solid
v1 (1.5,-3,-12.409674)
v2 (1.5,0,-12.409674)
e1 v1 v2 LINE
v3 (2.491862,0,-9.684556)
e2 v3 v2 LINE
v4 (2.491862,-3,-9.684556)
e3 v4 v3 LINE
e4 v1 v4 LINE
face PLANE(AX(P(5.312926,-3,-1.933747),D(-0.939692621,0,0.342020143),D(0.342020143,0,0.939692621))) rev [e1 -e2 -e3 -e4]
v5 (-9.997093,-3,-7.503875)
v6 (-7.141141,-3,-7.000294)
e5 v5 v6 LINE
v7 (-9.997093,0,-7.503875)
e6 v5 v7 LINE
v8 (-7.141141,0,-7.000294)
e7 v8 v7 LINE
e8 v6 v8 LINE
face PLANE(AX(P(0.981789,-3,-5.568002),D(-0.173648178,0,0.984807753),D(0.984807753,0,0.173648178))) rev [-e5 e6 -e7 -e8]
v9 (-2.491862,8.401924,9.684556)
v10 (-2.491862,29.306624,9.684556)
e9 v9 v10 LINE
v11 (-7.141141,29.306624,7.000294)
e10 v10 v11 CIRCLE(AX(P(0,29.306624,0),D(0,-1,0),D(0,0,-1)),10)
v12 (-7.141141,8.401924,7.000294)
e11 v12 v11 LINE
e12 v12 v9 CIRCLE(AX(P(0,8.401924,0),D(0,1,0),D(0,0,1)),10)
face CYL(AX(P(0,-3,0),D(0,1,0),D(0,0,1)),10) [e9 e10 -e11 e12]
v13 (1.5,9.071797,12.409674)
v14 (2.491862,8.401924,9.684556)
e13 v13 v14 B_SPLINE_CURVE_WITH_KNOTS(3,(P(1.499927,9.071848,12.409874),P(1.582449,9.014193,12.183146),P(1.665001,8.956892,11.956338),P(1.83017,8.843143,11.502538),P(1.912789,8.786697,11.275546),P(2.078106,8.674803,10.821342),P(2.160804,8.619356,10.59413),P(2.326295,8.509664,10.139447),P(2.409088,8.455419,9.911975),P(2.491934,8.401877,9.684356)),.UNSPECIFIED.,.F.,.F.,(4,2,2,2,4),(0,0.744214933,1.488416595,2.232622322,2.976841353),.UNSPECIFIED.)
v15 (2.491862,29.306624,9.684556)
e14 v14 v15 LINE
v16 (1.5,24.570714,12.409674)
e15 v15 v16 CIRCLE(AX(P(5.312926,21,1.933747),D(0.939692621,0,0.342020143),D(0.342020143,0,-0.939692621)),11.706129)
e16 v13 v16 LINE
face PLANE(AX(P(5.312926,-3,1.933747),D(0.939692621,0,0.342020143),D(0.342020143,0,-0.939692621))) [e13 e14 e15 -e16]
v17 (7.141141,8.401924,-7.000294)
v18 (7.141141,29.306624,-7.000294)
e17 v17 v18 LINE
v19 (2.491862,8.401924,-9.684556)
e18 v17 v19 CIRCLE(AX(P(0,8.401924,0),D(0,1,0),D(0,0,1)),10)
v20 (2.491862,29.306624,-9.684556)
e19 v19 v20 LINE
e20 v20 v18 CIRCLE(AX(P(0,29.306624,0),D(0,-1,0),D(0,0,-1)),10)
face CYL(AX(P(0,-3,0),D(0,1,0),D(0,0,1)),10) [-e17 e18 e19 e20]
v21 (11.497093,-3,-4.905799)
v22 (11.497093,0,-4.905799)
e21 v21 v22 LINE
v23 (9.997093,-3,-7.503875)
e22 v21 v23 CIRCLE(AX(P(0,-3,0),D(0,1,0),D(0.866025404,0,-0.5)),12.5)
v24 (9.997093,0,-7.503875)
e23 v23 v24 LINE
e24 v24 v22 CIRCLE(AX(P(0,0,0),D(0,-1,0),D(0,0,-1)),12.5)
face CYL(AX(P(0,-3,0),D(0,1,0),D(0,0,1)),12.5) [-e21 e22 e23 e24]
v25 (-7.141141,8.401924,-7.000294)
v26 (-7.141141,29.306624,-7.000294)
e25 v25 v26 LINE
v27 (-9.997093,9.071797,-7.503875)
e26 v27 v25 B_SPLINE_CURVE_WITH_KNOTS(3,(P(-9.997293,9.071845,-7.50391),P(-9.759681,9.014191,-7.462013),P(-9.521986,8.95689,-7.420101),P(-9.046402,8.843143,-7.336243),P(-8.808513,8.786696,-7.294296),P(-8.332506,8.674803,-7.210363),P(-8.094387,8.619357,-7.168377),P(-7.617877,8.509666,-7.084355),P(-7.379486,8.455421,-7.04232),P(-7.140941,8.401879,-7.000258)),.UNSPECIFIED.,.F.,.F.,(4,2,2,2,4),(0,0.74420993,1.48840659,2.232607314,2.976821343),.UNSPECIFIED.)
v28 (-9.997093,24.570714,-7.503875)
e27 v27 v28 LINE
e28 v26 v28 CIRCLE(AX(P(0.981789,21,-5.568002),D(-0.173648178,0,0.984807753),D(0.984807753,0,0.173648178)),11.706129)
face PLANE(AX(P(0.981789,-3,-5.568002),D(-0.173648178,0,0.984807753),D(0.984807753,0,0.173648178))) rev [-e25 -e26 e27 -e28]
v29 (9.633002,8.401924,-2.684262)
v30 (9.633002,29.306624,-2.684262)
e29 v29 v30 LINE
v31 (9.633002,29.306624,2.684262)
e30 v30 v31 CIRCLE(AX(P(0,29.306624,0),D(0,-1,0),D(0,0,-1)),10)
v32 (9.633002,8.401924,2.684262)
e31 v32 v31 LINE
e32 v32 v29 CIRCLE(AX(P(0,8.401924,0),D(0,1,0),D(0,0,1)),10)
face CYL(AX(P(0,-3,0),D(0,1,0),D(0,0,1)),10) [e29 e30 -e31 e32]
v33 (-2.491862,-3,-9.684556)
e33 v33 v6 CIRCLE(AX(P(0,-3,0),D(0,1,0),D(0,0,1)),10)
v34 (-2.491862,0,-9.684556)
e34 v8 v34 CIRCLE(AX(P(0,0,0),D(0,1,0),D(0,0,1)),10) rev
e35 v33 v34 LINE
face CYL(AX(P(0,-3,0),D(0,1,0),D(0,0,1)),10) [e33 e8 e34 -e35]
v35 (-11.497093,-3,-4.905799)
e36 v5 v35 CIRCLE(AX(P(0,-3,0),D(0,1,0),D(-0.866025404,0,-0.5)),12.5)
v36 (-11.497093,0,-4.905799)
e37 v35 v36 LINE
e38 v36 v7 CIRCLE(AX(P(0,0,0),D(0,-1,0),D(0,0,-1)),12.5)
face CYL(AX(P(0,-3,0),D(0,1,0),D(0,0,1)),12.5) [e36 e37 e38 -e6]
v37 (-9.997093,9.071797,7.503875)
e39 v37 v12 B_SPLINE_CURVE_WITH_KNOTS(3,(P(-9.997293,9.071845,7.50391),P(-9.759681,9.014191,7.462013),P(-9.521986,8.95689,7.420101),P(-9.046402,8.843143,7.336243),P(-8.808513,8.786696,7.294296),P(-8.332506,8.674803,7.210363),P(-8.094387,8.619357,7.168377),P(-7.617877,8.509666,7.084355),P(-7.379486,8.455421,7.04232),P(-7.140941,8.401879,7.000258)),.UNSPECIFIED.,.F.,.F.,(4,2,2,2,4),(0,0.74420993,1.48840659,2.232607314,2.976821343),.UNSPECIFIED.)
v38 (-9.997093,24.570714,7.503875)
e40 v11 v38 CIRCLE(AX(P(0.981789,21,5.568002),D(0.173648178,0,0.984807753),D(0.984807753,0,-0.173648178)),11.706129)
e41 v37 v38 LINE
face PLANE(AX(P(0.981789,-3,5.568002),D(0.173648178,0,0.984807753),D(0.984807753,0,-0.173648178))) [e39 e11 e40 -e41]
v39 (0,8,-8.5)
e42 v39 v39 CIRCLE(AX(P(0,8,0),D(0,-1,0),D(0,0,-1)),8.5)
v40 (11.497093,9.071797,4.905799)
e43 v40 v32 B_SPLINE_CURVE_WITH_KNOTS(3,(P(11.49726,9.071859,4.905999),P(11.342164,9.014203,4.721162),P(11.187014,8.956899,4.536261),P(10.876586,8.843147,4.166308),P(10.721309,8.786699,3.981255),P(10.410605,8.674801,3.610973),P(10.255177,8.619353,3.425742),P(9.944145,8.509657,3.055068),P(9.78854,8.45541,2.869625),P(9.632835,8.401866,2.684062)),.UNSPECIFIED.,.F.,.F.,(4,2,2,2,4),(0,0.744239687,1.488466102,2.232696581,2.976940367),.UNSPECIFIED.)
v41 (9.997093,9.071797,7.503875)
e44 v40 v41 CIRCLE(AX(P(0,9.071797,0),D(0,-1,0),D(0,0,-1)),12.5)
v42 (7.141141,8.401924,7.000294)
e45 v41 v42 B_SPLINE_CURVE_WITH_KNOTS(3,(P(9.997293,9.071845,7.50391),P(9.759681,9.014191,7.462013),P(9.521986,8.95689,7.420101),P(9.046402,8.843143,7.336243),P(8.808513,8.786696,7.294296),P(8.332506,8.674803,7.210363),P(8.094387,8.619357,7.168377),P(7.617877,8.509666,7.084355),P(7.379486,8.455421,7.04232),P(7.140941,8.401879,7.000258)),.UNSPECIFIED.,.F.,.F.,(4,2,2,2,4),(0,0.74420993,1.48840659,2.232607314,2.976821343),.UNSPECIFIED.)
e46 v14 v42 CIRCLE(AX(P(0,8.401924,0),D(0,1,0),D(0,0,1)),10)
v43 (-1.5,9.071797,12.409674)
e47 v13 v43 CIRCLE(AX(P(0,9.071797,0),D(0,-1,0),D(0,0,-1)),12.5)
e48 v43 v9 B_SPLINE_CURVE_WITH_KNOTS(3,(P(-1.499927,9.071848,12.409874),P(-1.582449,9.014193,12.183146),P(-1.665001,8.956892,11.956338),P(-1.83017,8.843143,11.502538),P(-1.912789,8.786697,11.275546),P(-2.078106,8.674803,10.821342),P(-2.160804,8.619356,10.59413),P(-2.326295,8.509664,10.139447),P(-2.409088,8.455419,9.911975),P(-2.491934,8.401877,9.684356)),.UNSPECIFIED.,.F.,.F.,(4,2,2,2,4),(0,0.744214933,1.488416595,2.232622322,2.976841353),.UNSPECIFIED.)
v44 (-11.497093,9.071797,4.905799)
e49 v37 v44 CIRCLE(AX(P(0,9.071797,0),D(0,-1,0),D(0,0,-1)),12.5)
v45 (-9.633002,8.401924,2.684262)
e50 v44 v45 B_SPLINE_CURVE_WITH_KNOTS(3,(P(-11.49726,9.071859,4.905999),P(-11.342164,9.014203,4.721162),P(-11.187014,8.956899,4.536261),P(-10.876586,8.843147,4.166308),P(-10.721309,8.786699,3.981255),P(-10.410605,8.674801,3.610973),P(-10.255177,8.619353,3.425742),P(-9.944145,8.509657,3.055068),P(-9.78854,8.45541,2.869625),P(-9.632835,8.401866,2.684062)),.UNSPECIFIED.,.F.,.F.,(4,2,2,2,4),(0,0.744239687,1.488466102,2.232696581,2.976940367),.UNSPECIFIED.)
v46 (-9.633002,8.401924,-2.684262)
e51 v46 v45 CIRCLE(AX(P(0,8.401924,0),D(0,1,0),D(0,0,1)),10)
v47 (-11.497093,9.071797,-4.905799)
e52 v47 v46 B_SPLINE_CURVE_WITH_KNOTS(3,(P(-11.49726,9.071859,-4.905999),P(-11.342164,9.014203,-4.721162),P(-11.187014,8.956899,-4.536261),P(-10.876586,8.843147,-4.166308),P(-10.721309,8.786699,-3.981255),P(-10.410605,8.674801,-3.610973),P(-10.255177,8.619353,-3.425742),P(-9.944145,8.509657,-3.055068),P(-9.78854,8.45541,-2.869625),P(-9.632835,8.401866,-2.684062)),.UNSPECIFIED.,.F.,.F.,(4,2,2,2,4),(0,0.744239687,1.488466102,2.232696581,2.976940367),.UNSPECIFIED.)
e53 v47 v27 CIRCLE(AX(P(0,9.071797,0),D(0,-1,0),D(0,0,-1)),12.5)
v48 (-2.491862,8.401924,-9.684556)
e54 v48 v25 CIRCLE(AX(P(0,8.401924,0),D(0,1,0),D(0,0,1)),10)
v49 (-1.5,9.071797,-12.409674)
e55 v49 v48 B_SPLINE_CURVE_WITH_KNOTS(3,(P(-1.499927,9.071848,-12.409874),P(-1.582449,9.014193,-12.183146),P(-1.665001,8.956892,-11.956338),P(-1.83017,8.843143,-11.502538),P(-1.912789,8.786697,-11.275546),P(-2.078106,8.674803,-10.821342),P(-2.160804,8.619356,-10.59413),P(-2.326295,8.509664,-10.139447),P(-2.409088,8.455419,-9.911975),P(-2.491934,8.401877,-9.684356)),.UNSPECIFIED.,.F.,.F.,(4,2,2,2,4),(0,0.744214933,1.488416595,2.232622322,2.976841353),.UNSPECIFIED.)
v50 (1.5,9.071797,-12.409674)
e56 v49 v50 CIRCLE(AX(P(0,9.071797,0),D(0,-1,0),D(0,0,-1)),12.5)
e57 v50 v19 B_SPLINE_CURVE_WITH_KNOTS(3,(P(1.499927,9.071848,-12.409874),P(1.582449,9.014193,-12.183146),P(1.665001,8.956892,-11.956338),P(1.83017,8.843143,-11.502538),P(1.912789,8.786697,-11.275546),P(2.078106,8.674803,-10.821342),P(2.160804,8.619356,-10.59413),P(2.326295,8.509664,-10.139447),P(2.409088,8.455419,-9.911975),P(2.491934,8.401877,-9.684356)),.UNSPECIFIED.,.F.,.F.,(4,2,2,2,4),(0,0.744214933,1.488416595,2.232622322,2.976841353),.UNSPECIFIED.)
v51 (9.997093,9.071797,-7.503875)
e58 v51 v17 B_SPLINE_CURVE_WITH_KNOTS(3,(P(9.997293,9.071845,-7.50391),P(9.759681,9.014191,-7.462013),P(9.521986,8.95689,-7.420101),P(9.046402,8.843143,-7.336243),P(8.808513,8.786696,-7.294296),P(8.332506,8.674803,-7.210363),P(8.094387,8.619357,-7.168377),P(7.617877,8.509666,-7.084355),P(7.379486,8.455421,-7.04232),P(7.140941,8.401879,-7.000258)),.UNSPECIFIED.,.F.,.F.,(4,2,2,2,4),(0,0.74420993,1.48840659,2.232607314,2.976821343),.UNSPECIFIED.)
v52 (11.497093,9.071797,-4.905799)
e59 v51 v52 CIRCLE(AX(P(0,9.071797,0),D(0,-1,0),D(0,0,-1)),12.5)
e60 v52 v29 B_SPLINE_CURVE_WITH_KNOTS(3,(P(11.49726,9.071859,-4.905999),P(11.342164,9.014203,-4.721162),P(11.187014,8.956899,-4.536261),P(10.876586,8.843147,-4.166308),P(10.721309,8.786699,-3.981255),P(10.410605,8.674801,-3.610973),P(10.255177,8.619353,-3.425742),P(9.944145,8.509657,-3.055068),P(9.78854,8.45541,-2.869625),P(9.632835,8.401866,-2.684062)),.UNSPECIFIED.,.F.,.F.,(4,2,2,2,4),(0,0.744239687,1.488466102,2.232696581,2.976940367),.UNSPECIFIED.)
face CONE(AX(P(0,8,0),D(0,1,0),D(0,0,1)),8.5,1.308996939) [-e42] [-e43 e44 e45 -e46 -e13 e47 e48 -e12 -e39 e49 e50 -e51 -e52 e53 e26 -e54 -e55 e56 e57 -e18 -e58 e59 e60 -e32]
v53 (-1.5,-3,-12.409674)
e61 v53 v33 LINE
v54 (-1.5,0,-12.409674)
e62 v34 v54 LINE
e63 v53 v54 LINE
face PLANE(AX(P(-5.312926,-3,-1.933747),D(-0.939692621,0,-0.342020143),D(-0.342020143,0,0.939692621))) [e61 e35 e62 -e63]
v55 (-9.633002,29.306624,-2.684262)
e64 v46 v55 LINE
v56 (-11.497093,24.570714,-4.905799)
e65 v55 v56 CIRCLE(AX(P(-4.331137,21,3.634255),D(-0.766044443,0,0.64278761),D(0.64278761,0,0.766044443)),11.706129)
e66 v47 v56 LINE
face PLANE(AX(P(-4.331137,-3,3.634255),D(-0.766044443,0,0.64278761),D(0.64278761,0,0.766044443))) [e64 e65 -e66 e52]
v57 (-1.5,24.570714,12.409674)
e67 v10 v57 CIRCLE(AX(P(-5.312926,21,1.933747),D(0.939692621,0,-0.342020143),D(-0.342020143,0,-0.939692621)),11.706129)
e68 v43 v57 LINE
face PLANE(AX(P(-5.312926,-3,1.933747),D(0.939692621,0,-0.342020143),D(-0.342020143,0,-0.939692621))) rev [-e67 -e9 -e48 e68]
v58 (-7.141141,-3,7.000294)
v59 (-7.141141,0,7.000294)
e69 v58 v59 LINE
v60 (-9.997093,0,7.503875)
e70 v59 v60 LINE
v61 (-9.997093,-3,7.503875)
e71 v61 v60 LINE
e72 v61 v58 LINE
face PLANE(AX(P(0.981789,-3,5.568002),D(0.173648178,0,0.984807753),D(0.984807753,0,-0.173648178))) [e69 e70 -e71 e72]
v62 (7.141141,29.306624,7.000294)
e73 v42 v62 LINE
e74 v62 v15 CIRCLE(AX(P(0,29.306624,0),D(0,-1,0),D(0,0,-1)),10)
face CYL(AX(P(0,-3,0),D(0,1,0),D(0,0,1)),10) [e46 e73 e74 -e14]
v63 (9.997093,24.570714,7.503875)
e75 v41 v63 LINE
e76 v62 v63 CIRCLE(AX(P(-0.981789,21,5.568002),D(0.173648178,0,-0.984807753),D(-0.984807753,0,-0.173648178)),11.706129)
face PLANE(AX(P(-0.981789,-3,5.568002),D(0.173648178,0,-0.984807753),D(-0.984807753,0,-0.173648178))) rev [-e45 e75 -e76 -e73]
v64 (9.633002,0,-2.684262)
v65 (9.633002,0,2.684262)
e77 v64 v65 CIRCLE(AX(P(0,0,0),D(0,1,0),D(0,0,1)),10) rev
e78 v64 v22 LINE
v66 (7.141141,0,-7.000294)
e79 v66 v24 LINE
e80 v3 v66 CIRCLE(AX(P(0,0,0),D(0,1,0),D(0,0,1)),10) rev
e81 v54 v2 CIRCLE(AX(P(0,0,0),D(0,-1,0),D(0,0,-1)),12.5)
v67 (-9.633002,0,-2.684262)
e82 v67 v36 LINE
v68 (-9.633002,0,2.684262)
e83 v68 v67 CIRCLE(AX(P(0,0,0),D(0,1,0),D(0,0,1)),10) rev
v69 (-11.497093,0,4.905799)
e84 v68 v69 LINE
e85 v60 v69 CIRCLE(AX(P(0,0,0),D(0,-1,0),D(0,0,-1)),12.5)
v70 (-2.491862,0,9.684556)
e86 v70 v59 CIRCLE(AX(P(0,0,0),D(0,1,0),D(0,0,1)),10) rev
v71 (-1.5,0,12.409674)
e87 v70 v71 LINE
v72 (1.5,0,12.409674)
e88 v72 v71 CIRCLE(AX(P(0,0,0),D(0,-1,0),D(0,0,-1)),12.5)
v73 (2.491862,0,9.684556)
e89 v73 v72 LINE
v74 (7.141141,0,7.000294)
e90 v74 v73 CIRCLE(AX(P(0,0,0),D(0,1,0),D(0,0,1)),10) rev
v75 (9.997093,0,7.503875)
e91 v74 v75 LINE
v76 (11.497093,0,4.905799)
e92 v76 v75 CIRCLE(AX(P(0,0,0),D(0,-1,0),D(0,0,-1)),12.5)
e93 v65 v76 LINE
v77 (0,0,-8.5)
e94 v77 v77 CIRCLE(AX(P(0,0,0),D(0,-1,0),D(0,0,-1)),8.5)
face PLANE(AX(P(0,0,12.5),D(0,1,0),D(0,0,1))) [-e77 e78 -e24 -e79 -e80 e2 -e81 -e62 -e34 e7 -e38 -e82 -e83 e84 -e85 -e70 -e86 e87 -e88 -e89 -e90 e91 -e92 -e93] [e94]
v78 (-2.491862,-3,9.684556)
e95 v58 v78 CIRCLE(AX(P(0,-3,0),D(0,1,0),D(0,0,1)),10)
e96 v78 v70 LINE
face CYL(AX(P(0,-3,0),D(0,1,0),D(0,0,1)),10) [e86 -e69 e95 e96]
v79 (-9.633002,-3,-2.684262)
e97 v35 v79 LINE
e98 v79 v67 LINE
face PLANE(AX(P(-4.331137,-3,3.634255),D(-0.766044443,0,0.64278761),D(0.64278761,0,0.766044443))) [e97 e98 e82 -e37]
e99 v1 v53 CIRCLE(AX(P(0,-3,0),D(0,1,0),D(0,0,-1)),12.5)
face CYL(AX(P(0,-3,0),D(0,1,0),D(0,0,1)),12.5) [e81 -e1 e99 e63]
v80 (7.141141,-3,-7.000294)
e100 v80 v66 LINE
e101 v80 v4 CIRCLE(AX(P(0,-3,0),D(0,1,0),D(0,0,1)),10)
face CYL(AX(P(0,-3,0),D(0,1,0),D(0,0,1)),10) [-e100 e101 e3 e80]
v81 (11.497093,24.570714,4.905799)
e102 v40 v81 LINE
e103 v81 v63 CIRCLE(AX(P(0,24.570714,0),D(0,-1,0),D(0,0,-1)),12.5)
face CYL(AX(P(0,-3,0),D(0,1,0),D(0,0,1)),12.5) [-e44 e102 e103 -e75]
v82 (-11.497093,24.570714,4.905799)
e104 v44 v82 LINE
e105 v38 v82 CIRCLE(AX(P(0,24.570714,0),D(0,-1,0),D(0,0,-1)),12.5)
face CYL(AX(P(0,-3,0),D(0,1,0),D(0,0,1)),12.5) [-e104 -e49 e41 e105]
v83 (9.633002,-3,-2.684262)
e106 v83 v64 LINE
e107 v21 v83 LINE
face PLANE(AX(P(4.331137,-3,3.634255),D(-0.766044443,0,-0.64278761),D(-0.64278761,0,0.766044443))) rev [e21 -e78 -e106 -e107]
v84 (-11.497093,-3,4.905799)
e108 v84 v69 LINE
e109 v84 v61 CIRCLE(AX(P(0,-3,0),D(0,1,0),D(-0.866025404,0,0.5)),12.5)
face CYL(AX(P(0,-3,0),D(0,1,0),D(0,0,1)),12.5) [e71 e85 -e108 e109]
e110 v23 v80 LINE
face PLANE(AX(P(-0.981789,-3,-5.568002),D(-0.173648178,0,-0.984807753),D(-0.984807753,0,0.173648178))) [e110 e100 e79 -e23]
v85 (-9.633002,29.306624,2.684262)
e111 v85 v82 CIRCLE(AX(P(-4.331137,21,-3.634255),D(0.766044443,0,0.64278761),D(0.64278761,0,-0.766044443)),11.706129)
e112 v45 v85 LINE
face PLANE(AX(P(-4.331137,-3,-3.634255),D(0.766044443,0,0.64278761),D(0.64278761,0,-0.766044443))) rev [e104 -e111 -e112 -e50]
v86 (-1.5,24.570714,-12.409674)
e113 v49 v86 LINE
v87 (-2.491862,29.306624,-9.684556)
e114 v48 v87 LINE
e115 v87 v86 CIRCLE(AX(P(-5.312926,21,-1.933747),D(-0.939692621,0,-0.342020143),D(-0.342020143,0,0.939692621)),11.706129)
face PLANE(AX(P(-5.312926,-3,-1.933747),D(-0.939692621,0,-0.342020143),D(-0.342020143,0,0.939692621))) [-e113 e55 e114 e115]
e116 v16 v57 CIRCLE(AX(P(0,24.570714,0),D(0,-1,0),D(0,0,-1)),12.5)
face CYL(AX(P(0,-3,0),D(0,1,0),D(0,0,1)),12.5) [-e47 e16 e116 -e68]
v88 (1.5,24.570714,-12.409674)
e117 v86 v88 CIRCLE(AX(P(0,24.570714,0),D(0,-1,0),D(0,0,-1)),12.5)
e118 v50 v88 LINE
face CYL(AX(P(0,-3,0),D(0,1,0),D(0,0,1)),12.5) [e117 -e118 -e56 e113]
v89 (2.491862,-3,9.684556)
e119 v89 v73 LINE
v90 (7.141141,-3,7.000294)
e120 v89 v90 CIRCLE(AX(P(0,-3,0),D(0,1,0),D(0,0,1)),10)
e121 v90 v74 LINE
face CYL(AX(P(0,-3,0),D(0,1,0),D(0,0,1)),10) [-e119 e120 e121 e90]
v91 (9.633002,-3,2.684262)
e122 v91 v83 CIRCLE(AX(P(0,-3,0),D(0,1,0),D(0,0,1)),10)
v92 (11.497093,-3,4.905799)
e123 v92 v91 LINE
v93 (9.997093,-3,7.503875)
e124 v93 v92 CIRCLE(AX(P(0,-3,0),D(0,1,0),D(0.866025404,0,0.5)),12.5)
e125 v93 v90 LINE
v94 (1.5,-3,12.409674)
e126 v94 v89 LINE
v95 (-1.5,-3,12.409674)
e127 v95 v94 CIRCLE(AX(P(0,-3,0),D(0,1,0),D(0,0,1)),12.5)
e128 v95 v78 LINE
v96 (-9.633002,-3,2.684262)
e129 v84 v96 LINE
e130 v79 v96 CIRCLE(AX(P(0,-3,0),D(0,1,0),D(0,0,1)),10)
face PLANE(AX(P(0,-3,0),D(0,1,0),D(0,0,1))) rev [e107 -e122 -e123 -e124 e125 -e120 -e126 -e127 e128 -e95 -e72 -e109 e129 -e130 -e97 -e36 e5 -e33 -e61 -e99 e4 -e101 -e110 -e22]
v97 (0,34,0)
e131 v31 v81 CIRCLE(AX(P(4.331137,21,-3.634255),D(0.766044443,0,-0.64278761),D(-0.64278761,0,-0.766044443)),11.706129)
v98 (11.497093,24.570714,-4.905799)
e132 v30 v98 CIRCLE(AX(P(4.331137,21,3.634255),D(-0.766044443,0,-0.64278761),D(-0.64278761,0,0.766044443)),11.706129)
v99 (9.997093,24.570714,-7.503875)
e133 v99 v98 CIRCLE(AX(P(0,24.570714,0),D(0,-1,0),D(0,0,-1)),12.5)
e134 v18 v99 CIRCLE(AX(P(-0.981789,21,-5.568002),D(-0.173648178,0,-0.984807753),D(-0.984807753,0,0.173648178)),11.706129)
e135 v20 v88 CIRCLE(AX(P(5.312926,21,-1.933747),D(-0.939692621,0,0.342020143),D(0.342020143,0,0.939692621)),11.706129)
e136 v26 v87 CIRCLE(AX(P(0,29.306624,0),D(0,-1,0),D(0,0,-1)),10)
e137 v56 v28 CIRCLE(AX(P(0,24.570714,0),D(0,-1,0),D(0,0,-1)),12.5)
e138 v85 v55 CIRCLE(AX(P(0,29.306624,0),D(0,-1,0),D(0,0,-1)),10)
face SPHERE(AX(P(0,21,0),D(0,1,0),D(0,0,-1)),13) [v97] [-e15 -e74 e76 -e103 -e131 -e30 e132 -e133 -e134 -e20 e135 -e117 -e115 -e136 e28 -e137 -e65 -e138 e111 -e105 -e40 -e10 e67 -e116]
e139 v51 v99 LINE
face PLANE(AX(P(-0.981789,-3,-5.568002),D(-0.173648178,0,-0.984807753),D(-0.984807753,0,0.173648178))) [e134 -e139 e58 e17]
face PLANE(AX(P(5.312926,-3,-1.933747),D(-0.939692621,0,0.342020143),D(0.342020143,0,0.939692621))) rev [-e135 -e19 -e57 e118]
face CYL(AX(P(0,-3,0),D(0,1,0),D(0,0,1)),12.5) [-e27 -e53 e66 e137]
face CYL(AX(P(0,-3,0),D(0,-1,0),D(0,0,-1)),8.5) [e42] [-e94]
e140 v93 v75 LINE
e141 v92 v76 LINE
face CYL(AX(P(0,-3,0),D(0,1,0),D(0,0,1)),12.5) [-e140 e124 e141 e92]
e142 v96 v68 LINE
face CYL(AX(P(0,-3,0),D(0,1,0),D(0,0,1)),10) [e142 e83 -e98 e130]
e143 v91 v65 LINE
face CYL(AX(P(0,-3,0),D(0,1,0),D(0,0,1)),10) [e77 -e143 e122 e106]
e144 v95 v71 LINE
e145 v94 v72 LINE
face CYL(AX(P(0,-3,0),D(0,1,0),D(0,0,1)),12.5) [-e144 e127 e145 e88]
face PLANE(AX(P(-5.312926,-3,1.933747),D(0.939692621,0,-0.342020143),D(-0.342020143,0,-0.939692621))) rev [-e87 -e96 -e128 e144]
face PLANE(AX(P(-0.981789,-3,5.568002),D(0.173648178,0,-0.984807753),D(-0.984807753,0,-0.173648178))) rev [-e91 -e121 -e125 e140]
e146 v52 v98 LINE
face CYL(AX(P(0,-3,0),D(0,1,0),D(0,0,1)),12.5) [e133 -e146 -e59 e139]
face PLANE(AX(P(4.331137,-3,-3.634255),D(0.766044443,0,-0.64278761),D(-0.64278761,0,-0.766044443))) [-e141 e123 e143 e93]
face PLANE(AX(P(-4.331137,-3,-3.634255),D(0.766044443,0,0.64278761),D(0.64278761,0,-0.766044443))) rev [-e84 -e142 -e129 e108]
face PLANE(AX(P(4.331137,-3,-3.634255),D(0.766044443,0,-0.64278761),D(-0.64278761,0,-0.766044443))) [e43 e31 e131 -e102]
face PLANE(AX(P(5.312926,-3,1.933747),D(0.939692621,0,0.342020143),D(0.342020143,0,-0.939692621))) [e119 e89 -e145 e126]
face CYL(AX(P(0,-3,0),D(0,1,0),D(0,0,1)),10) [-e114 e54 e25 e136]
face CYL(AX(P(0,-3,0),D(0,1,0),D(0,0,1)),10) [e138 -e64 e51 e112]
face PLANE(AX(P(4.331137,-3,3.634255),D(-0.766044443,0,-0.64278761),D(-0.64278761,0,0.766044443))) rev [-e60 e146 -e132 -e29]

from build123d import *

# Parameters (mm, degrees)
EXTRUDE_1_DEPTH          = 34
EXTRUDE_1_DEPTH_BACK     = 3
EXTRUDE_START            = -3
EXTRUDE_2_DEPTH          = 37
PATTERN_CIRCULAR_1_COUNT = 6


# Read off the part's stored shape, not the designer's step: 切除-旋转-薄壁1
with BuildPart() as part:
    # 草图2 → 凸台-拉伸1 (new, two sides: drawn at the far end of the back side and taken through both)
    with BuildSketch(Plane(origin=(0, 0, 0), x_dir=(1, 0, 0), z_dir=(0, 1, 0)).offset(-EXTRUDE_1_DEPTH_BACK)):
        with BuildLine():
            ThreePointArc((-2.491861702, -9.684556018), (-1.255874162, -9.920825575), (0, -10))
            Line((0, -10), (0, 10))
            ThreePointArc((0, 10), (-9.920825575, 1.255874162), (-2.491861702, -9.684556018))
        make_face()
        with BuildLine():
            Line((0, 10), (0, -10))
            ThreePointArc((0, -10), (1.255874162, -9.920825575), (2.491861702, -9.684556018))
            ThreePointArc((2.491861702, -9.684556018), (7.903120175, -6.127045903), (10, 0))
            ThreePointArc((10, 0), (7.071067812, 7.071067812), (0, 10))
        make_face()
    extrude(amount=EXTRUDE_1_DEPTH + EXTRUDE_1_DEPTH_BACK)

    # 草图2<3> → 凸台-拉伸2 (add)
    with BuildSketch(Plane(origin=(0, 0, 0), x_dir=(1, 0, 0), z_dir=(0, 1, 0)).offset(EXTRUDE_START)):
        with BuildLine():
            ThreePointArc((-1.5, -12.409673646), (-0.751358578, -12.477397977), (0, -12.5))
            Line((0, -12.5), (0, -10))
            ThreePointArc((0, -10), (-1.255874162, -9.920825575), (-2.491861702, -9.684556018))
            Line((-2.491861702, -9.684556018), (-1.5, -12.409673646))
        make_face()
        with BuildLine():
            Line((0, -10), (0, -12.5))
            ThreePointArc((0, -12.5), (0.751358578, -12.477397977), (1.5, -12.409673646))
            Line((1.5, -12.409673646), (2.491861702, -9.684556018))
            ThreePointArc((2.491861702, -9.684556018), (1.255874162, -9.920825575), (0, -10))
        make_face()
    extrude_2 = extrude(amount=EXTRUDE_2_DEPTH)

    # 阵列(圆周)1: 凸台-拉伸2 ×6 about axis
    pattern_circular_1_axis = Axis((0, 0, 0), (0, 1, 0))
    for i in range(1, PATTERN_CIRCULAR_1_COUNT):
        add(extrude_2.rotate(pattern_circular_1_axis, i * 360 / PATTERN_CIRCULAR_1_COUNT))

    # 草图3 → 切除-旋转1 (revolve, cut)
    with BuildSketch(Plane(origin=(0, 0, 0), x_dir=(0, 0, -1), z_dir=(1, 0, 0)), mode=Mode.PRIVATE) as cut_revolve_1_sk:
        Polygon((-12.5, 0), (-8.5, 0), (-8.5, 8), (-12.5, 9.07179677), align=None)
    revolve(cut_revolve_1_sk.sketch.rotate(Axis((0, -3, 0), (0, 1, 0)), 353.107897421), axis=Axis((0, -3, 0), (0, 1, 0)), mode=Mode.SUBTRACT)

    # 切除-旋转-薄壁1 outline → 切除-旋转-薄壁1 (revolve, cut)
    with BuildSketch(Plane.XY):
        with BuildLine():
            ThreePointArc((0, 34), (7.828815855, 31.378325603), (12.500000004, 24.570714202))
            Line((12.500000004, 24.570714202), (12.500000004, 34))
            Line((12.500000004, 34), (0, 34))
        make_face()
    revolve(axis=Axis((0, 0, 0), (0, 1, 0)), mode=Mode.SUBTRACT)


solid = part.part
